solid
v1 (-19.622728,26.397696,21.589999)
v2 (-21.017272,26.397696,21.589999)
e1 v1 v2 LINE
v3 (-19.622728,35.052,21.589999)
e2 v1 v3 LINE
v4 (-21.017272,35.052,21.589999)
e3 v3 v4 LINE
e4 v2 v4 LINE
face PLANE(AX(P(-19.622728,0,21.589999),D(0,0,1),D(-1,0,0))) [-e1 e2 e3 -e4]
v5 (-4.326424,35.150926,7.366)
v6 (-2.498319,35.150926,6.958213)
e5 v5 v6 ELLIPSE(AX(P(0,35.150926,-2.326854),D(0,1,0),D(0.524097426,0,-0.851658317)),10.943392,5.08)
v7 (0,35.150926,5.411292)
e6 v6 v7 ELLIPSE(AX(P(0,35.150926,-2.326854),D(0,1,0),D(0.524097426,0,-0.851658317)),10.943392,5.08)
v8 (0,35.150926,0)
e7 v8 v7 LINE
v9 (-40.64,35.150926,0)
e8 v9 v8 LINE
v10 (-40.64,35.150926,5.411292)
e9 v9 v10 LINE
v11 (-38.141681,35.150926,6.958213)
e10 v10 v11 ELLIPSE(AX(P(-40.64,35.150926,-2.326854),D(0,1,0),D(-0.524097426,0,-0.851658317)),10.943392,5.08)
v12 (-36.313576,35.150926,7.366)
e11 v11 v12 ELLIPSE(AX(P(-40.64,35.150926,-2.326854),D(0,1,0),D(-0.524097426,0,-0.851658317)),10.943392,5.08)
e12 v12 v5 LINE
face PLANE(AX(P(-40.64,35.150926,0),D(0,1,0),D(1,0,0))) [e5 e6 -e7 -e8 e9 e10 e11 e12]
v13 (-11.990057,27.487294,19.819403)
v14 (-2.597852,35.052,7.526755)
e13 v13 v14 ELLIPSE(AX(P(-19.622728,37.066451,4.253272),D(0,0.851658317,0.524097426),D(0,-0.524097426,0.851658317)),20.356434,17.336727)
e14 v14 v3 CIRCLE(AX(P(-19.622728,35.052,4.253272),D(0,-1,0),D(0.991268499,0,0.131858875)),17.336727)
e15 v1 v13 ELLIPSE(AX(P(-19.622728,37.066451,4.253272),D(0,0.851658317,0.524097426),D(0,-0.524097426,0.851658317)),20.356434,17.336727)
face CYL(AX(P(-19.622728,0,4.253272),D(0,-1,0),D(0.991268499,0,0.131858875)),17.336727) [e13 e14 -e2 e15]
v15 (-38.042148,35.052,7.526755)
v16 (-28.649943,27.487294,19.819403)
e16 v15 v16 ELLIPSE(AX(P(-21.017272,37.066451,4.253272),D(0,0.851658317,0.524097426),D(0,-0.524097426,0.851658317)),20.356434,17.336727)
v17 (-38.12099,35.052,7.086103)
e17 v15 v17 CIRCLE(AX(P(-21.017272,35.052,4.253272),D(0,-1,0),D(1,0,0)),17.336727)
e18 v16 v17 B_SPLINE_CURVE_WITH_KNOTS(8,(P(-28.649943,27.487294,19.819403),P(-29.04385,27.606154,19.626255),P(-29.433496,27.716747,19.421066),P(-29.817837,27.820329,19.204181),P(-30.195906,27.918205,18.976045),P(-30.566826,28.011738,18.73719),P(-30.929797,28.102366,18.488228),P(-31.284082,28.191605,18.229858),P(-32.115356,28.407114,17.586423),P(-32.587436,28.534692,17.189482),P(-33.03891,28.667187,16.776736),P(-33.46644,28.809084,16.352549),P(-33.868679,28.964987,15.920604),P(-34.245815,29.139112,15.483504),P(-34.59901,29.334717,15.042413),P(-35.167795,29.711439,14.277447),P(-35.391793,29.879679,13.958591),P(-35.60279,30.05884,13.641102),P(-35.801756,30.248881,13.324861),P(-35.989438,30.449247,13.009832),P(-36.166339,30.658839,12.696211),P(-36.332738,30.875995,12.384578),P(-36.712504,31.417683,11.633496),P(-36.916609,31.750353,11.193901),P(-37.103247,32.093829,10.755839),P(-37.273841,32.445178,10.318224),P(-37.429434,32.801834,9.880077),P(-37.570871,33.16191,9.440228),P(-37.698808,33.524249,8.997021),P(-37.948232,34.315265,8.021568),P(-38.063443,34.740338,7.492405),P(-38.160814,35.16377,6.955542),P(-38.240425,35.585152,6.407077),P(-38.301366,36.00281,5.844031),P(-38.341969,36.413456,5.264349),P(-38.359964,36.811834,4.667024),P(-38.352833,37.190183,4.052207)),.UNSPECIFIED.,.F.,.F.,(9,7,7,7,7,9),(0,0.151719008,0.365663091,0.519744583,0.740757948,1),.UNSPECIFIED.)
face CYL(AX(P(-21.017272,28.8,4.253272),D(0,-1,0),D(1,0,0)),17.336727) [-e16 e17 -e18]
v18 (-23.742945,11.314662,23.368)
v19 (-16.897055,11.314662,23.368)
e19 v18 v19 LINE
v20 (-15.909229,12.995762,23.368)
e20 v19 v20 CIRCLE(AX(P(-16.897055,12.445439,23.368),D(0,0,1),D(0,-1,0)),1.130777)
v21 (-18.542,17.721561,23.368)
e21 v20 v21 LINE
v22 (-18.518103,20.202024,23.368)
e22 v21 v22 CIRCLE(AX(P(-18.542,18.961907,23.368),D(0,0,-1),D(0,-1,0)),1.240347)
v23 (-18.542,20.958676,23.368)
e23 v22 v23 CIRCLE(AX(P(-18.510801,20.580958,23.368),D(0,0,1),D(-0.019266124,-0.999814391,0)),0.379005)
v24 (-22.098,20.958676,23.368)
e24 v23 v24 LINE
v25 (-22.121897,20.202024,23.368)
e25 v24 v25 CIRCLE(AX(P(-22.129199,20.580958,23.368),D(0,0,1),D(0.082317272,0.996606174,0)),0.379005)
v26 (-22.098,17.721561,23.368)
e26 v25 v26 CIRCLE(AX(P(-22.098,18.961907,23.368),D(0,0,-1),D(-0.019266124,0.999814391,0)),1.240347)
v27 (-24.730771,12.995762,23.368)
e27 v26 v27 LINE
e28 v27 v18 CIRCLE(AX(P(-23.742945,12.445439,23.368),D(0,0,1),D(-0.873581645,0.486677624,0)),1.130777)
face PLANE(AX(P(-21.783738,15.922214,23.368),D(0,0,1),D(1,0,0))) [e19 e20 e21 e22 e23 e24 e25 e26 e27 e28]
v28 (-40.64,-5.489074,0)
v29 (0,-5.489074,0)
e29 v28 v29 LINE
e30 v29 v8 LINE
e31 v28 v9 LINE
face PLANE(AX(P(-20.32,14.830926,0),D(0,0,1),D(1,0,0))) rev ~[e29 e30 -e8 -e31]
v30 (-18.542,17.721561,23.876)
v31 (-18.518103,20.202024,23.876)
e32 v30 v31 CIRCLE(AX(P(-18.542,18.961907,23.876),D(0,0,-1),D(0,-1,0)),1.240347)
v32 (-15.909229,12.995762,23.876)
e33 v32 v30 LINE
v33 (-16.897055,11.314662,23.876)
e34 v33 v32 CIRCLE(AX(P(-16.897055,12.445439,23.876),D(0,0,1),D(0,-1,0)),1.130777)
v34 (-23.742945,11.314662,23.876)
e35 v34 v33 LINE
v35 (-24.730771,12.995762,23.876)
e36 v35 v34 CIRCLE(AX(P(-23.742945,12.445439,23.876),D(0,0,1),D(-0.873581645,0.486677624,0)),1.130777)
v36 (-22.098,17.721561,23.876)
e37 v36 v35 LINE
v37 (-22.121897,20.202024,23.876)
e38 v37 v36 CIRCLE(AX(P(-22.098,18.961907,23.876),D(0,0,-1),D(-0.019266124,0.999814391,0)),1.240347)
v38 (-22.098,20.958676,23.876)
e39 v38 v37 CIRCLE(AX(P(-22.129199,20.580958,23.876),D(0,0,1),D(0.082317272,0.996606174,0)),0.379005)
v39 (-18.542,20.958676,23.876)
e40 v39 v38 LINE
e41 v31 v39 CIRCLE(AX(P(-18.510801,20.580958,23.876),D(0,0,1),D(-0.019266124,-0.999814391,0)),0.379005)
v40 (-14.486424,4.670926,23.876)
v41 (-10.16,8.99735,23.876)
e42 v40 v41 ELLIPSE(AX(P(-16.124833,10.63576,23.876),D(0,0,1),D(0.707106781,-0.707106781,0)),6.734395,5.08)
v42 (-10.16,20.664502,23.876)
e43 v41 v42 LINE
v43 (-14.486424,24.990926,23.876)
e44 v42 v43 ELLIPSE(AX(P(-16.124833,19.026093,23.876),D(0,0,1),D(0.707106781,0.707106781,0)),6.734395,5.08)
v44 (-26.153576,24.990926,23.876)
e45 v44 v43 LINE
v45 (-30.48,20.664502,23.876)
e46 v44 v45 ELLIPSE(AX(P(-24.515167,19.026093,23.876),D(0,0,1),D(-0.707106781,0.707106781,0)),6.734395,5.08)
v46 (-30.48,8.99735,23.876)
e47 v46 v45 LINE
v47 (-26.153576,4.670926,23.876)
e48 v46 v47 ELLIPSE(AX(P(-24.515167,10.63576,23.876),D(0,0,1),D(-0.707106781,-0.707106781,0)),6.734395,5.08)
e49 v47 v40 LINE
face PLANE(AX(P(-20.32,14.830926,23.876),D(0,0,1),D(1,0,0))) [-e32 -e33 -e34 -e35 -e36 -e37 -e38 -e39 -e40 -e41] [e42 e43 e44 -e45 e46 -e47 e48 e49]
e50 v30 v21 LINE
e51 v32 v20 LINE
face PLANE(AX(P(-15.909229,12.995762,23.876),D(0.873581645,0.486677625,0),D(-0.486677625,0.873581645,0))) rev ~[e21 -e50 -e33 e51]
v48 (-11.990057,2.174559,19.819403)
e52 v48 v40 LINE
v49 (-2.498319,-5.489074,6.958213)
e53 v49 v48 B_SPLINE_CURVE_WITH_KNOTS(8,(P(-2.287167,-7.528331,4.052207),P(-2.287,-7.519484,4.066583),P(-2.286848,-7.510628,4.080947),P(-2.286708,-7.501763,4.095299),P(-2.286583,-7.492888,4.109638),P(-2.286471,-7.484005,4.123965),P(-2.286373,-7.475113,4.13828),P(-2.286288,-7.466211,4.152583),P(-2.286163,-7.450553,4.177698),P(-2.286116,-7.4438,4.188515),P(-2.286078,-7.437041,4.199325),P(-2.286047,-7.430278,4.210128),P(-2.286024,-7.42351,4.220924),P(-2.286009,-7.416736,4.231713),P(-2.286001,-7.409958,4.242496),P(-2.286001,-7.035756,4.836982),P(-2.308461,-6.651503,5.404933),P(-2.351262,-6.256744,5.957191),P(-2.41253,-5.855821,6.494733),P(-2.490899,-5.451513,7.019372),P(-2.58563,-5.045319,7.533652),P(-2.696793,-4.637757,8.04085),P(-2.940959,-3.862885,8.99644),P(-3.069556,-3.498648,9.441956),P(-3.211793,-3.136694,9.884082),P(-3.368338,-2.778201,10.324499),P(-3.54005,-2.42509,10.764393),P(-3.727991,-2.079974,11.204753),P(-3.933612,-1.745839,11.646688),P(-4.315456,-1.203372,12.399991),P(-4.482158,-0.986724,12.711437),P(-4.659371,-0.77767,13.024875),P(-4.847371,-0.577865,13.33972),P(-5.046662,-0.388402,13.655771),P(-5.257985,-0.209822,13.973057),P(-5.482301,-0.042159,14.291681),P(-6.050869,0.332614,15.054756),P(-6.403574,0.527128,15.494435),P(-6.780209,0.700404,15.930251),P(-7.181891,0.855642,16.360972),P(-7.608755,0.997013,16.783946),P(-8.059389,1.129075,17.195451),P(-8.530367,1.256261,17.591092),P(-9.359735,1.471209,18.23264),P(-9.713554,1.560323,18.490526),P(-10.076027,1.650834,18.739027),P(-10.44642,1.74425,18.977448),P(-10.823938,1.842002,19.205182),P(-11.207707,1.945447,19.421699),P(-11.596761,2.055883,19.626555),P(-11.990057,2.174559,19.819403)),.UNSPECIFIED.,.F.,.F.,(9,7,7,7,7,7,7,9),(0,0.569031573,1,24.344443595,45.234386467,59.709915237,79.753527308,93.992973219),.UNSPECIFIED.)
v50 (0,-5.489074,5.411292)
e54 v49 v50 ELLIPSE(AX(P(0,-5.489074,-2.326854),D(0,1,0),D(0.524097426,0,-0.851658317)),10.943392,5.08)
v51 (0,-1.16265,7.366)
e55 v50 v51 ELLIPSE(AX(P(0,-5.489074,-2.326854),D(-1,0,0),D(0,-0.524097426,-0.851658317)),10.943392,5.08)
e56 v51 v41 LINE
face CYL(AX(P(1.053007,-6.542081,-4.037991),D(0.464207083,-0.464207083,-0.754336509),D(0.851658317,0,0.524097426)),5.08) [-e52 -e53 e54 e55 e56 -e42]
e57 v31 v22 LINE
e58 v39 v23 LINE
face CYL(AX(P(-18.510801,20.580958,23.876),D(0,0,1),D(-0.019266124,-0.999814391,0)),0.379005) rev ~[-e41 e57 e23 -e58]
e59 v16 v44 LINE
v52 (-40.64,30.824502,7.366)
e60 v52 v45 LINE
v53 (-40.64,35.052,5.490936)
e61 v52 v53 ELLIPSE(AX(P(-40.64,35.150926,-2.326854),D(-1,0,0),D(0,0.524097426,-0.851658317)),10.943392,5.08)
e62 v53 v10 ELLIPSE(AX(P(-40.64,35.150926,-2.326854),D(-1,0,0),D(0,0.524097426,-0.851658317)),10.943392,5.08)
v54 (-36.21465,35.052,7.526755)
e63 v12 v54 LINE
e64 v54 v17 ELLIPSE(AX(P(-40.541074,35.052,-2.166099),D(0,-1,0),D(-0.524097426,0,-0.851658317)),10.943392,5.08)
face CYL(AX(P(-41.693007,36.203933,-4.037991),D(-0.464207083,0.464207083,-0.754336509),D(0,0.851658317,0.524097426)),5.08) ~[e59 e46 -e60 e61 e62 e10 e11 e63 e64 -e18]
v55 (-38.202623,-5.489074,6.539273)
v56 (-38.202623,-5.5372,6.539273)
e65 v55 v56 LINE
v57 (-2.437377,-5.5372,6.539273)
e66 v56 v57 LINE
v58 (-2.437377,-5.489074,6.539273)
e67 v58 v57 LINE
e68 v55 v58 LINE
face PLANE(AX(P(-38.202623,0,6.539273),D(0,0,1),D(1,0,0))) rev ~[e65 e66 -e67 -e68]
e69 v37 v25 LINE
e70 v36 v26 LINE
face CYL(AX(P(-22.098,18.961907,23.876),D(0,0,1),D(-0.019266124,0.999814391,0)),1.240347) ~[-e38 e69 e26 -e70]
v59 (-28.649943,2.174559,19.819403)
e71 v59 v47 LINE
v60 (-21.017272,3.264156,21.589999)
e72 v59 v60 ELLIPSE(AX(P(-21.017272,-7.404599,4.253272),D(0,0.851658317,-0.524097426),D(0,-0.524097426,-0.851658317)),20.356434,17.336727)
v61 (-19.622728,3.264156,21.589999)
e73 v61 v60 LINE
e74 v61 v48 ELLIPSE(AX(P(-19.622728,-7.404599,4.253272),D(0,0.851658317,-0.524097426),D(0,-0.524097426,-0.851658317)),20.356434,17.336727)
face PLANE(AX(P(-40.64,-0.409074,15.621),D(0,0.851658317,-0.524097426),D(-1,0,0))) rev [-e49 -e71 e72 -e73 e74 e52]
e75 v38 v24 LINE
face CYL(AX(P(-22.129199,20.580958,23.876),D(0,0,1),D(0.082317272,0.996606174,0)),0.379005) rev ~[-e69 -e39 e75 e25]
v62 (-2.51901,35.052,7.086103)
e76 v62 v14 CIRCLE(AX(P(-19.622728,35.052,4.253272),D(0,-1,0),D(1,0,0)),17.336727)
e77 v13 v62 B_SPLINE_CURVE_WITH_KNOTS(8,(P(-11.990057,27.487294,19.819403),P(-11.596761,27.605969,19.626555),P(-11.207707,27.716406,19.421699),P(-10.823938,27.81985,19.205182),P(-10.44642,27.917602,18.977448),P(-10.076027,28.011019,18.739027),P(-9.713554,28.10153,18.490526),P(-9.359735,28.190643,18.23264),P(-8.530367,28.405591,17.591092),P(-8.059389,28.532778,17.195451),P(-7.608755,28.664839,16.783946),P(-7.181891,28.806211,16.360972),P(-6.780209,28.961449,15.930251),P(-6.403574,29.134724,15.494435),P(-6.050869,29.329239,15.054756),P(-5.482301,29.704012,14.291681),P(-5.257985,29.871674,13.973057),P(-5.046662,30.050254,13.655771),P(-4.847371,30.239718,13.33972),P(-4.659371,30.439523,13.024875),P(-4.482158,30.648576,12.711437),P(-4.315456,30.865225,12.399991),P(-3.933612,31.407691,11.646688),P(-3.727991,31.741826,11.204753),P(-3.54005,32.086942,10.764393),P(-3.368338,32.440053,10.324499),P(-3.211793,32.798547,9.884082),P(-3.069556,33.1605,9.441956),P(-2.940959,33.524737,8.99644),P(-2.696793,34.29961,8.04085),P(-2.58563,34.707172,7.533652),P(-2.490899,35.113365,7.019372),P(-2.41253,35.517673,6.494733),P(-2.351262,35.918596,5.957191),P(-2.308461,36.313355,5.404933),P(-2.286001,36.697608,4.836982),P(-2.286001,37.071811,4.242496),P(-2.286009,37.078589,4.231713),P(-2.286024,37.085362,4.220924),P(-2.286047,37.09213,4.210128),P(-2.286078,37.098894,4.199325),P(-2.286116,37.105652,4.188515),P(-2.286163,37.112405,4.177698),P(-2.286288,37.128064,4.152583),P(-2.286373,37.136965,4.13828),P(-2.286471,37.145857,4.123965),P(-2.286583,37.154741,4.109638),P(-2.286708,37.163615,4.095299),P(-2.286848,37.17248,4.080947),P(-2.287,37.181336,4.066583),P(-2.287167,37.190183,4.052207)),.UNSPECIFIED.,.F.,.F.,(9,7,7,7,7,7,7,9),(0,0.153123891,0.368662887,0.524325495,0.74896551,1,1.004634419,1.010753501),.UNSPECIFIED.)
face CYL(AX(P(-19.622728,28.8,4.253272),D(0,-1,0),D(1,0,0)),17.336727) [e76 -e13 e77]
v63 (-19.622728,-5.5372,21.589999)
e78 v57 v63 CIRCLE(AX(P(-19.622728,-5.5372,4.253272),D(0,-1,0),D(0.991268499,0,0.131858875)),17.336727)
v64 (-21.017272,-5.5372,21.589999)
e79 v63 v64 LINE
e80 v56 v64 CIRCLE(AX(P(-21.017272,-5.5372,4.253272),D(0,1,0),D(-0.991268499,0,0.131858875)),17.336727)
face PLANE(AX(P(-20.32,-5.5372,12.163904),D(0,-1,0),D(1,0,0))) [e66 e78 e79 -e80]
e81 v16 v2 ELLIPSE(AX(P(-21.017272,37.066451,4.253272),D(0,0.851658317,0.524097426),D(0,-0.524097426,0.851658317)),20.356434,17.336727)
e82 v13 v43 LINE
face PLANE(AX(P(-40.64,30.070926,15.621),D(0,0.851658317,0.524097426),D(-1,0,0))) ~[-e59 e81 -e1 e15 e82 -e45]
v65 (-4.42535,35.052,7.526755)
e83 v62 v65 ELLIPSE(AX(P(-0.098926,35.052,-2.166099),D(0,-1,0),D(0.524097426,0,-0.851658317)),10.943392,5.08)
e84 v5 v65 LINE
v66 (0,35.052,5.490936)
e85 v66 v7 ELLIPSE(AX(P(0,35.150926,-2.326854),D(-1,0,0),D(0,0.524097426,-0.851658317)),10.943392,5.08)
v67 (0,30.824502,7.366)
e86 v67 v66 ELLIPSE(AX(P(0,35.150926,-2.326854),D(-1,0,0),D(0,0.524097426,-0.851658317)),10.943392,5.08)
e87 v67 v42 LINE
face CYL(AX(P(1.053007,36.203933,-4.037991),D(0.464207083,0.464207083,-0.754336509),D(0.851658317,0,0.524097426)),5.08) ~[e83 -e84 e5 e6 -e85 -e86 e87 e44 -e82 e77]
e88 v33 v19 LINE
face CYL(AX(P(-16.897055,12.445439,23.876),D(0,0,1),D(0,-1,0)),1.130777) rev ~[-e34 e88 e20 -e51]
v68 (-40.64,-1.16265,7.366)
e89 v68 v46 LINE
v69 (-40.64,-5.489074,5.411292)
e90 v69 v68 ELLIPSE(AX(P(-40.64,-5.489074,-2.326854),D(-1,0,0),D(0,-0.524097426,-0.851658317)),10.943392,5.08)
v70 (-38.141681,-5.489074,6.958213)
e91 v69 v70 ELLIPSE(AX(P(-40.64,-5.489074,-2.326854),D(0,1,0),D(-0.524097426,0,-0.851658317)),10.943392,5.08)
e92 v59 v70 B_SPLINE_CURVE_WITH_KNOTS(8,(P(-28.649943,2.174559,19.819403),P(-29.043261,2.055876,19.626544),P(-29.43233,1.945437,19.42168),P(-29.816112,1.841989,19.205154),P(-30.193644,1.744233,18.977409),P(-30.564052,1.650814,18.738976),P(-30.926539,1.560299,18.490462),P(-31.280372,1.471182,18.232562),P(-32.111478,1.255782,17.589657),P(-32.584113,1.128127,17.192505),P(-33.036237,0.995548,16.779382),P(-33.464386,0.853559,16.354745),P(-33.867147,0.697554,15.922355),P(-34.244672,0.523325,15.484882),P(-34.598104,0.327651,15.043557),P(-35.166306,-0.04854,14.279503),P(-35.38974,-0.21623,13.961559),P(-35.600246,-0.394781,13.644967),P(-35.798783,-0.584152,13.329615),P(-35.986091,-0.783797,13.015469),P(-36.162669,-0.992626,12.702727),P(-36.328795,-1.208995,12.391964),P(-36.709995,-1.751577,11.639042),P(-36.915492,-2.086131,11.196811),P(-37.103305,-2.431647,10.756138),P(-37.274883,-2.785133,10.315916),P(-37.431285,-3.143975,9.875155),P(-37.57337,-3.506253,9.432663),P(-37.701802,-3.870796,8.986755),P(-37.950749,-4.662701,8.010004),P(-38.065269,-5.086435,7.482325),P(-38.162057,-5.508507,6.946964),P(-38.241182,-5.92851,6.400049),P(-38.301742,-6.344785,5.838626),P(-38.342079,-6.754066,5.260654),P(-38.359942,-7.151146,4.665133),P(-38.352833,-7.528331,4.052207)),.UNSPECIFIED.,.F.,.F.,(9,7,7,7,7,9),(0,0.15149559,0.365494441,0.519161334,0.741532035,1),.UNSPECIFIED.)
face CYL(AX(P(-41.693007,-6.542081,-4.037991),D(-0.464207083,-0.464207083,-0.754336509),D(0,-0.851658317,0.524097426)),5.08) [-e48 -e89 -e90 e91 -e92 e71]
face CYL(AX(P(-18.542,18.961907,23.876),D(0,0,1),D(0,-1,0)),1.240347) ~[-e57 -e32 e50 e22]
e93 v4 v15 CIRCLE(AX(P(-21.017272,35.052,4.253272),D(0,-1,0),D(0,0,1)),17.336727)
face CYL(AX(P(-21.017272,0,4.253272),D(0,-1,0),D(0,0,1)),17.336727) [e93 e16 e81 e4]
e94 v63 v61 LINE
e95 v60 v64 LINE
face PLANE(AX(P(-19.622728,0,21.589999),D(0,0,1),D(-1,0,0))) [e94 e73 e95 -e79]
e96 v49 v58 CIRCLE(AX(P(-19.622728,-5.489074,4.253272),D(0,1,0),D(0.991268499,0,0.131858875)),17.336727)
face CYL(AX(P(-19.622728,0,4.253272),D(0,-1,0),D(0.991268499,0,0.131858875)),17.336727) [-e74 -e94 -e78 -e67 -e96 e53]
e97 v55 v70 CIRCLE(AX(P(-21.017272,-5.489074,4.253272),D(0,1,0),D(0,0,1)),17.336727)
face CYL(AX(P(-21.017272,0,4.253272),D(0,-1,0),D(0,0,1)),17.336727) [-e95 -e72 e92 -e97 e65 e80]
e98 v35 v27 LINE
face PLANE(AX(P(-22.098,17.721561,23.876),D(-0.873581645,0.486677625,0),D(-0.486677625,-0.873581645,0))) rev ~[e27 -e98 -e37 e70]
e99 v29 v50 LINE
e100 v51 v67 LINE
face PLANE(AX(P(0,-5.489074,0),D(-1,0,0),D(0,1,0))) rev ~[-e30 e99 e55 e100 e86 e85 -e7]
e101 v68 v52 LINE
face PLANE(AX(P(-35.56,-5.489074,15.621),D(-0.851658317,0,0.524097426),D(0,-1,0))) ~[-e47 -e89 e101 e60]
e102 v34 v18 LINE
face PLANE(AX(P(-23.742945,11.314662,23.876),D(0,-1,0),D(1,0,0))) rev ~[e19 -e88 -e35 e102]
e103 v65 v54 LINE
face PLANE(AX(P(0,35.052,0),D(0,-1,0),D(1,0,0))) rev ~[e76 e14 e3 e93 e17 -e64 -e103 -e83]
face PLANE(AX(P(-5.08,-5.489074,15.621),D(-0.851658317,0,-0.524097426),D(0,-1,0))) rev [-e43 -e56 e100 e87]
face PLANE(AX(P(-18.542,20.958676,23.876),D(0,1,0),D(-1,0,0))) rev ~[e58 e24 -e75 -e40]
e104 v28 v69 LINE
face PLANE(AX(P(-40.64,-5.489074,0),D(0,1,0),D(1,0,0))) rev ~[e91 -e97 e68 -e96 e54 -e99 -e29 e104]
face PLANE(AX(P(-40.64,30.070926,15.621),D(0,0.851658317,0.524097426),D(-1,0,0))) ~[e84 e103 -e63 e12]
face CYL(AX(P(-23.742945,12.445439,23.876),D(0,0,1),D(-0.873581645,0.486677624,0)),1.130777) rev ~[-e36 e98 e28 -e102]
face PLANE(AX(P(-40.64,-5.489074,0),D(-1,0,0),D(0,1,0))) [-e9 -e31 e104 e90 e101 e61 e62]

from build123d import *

# Parameters (mm, degrees)
F0_W          = 40.64
F0_H          = 40.64
F1_DEPTH      = 23.876
F2_SIZE2      = 10.16
F2_SIZE       = 16.51
F4_DEPTH      = 5.5372
F4_DEPTH_BACK = 35.052
F6_DEPTH      = 0.508
F7_T4_DEPTH   = 41.0469310155
F7_S5_R       = 17.3367265746
F7_T6_DEPTH   = 25
F7_T10_DEPTH  = 41.0469310155
F7_S11_R      = 17.3367265746
F7_T12_DEPTH  = 25
F7_T16_DEPTH  = 41.0469310155
F7_S17_R      = 17.3367265746
F7_T18_DEPTH  = 25
F7_T23_DEPTH  = 41.0469310155
F7_S24_R      = 17.3367265746
F7_T25_DEPTH  = 25
F7_T30_DEPTH  = 41.0469310155
F7_S31_R      = 17.3367265746
F7_T32_DEPTH  = 25
F7_T37_DEPTH  = 41.0469310155
F7_S39_R      = 17.3367265746
F7_T40_DEPTH  = 25
F7_T44_DEPTH  = 41.0469310155
F7_S46_R      = 17.3367265746
F7_T47_DEPTH  = 25
F7_T51_DEPTH  = 41.0469310155
F7_S53_R      = 17.3367265746
F7_T54_DEPTH  = 25


# Not quite as in the source:
# - a fillet or chamfer that OpenCascade refuses, or shapes differently, is made with other operations: its cross-section is extruded or revolved along the edge and cut away or added


with BuildPart() as f1:
    # F0 (on Top) → F1 (new body)
    with BuildSketch(Plane.XY):
        with Locations((-20.32, 14.8309261845)):
            Rectangle(F0_W, F0_H)
    extrude(amount=F1_DEPTH)

    # F2
    f2_edges = [f1.edges().sort_by_distance(p)[0] for p in [
        (0, 14.830926, 23.876),
        (-20.32, 35.150926, 23.876),
        (-40.64, 14.830926, 23.876),
        (-20.32, -5.489074, 23.876),
    ]]
    chamfer(f2_edges, length=F2_SIZE, length2=F2_SIZE2)

    # F3 (on Front) → F4 (join, two sides)
    with BuildSketch(Plane.XZ) as f4_sk:
        with BuildLine():
            Line((-19.622727835, 21.5899987397), (-21.017272165, 21.5899987397))
            ThreePointArc((-21.017272165, 21.5899987397), (-32.4394065874, 17.2953936781), (-38.2026230943, 6.5392734254))
            Line((-38.2026230943, 6.5392734254), (-2.4373769057, 6.5392734254))
            ThreePointArc((-2.4373769057, 6.5392734254), (-8.2005934126, 17.2953936781), (-19.622727835, 21.5899987397))
        make_face()
    extrude(amount=F4_DEPTH)
    extrude(f4_sk.sketch, amount=-F4_DEPTH_BACK)

    # F5 (on face) → F6 (cut)
    with BuildSketch(Plane.XY.offset(23.876)):
        with BuildLine():
            Line((-20.32, 11.3146617191), (-20.32, 20.958676386))
            Line((-20.32, 20.958676386), (-22.098, 20.958676386))
            ThreePointArc((-22.098, 20.958676386), (-22.5080143202, 20.5929218839), (-22.1218966733, 20.2020238648))
            ThreePointArc((-22.1218966733, 20.2020238648), (-20.8577108363, 18.9738562556), (-22.098, 17.7215606446))
            Line((-22.098, 17.7215606446), (-24.7307707736, 12.9957624854))
            ThreePointArc((-24.7307707736, 12.9957624854), (-24.7178678661, 11.8725673854), (-23.7429447999, 11.3146617191))
            Line((-23.7429447999, 11.3146617191), (-20.32, 11.3146617191))
        make_face()
        with BuildLine():
            Line((-18.542, 20.958676386), (-20.32, 20.958676386))
            Line((-20.32, 20.958676386), (-20.32, 11.3146617191))
            Line((-20.32, 11.3146617191), (-16.8970552001, 11.3146617191))
            ThreePointArc((-16.8970552001, 11.3146617191), (-15.9221321339, 11.8725673854), (-15.9092292264, 12.9957624854))
            Line((-15.9092292264, 12.9957624854), (-18.542, 17.7215606446))
            ThreePointArc((-18.542, 17.7215606446), (-19.7822891637, 18.9738562556), (-18.5181033267, 20.2020238648))
            ThreePointArc((-18.5181033267, 20.2020238648), (-18.1319856798, 20.5929218839), (-18.542, 20.958676386))
        make_face()
    extrude(amount=-F6_DEPTH, mode=Mode.SUBTRACT)

    # F7: fillet of radius 5.08 on 4 edges, made by hand


with BuildPart() as f7_tool2:
    # F7_s3 → F7_t4 (new body)
    with BuildSketch(Plane(origin=(-11.8080697784, -11.8080697784, -19.18811339), x_dir=(-0.7071067812, 0.7071067812, 0), z_dir=(0.4642070825, 0.4642070825, 0.7543365091))):
        with BuildLine():
            ThreePointArc((21.7962143454, 27.1330755892), (24.85545827, 28.157532887), (27.9147021947, 27.1330755892))
            Line((27.9147021947, 27.1330755892), (24.85545827, 29.4407749719))
            Line((24.85545827, 29.4407749719), (21.7962143454, 27.1330755892))
        make_face()
    extrude(amount=F7_T4_DEPTH)

    # F7_s5 → F7_t6 (cut, symmetric)
    with BuildSketch(Plane.XZ.offset(-0.8)):
        with Locations((-21.017272165, 4.253272165)):
            Circle(F7_S5_R)
    extrude(amount=F7_T6_DEPTH, both=True, mode=Mode.SUBTRACT)


with BuildPart() as f1_1:
    add(f1.part)

    # F7_t1: cut F7_tool2
    add(f7_tool2.part, mode=Mode.SUBTRACT)


with BuildPart() as f7_tool8:
    # F7_s9 → F7_t10 (new body)
    with BuildSketch(Plane(origin=(3.050628701, -3.050628701, -4.9572716391), x_dir=(-0.7071067812, -0.7071067812, 0), z_dir=(-0.4642070825, 0.4642070825, 0.7543365091))):
        with BuildLine():
            ThreePointArc((0.8221173927, 5.4558434178), (3.8813613174, 6.4803007156), (6.9406052421, 5.4558434178))
            Line((6.9406052421, 5.4558434178), (3.8813613174, 7.7635428005))
            Line((3.8813613174, 7.7635428005), (0.8221173927, 5.4558434178))
        make_face()
    extrude(amount=F7_T10_DEPTH)

    # F7_s11 → F7_t12 (cut, symmetric)
    with BuildSketch(Plane.XZ.offset(-0.8)):
        with Locations((-19.622727835, 4.253272165)):
            Circle(F7_S11_R)
    extrude(amount=F7_T12_DEPTH, both=True, mode=Mode.SUBTRACT)


with BuildPart() as f1_2:
    add(f1_1.part)

    # F7_t7: cut F7_tool8
    add(f7_tool8.part, mode=Mode.SUBTRACT)


with BuildPart() as f7_tool14:
    # F7_s15 → F7_t16 (new body)
    with BuildSketch(Plane(origin=(9.442408336, 9.442408336, -15.3439135461), x_dir=(0.7071067812, -0.7071067812, 0), z_dir=(-0.4642070825, -0.4642070825, 0.7543365091))):
        with BuildLine():
            ThreePointArc((-21.7962143454, 21.2773704954), (-24.85545827, 22.3018277932), (-27.9147021947, 21.2773704954))
            Line((-27.9147021947, 21.2773704954), (-24.85545827, 23.5850698781))
            Line((-24.85545827, 23.5850698781), (-21.7962143454, 21.2773704954))
        make_face()
    extrude(amount=F7_T16_DEPTH)

    # F7_s17 → F7_t18 (cut, symmetric)
    with BuildSketch(Plane.XZ.offset(-28.8)):
        with Locations((-19.622727835, 4.253272165)):
            Circle(F7_S17_R)
    extrude(amount=F7_T18_DEPTH, both=True, mode=Mode.SUBTRACT)

    split(bisect_by=Plane.XZ.offset(-35.052), keep=Keep.BOTTOM)


with BuildPart() as f1_3:
    add(f1_2.part)

    # F7_t13: cut F7_tool14
    add(f7_tool14.part, mode=Mode.SUBTRACT)


with BuildPart() as f7_tool21:
    # F7_s22 → F7_t23 (new body)
    with BuildSketch(Plane(origin=(9.442408336, 9.442408336, -15.3439135461), x_dir=(0.7071067812, -0.7071067812, 0), z_dir=(-0.4642070825, -0.4642070825, 0.7543365091))):
        with BuildLine():
            ThreePointArc((-21.7962143454, 21.2773704954), (-24.85545827, 22.3018277932), (-27.9147021947, 21.2773704954))
            Line((-27.9147021947, 21.2773704954), (-24.85545827, 23.5850698781))
            Line((-24.85545827, 23.5850698781), (-21.7962143454, 21.2773704954))
        make_face()
    extrude(amount=F7_T23_DEPTH)

    # F7_s24 → F7_t25 (intersect, symmetric)
    with BuildSketch(Plane.XZ.offset(-28.8)):
        with Locations((-19.622727835, 4.253272165)):
            Circle(F7_S24_R)
    extrude(amount=F7_T25_DEPTH, both=True, mode=Mode.INTERSECT)

    split(bisect_by=Plane.XZ.offset(-35.052), keep=Keep.BOTTOM)


with BuildPart() as f1_4:
    add(f1_3.part)

    # F7_t20: cut F7_tool21
    add(f7_tool21.part, mode=Mode.SUBTRACT)


with BuildPart() as f7_tool28:
    # F7_s29 → F7_t30 (new body)
    with BuildSketch(Plane(origin=(9.442408336, 9.442408336, -15.3439135461), x_dir=(0.7071067812, -0.7071067812, 0), z_dir=(-0.4642070825, -0.4642070825, 0.7543365091))):
        with BuildLine():
            ThreePointArc((-21.7962143454, 21.2773704954), (-24.85545827, 22.3018277932), (-27.9147021947, 21.2773704954))
            Line((-27.9147021947, 21.2773704954), (-24.85545827, 23.5850698781))
            Line((-24.85545827, 23.5850698781), (-21.7962143454, 21.2773704954))
        make_face()
    extrude(amount=F7_T30_DEPTH)

    # F7_s31 → F7_t32 (cut, symmetric)
    with BuildSketch(Plane.XZ.offset(-28.8)):
        with Locations((-19.622727835, 4.253272165)):
            Circle(F7_S31_R)
    extrude(amount=F7_T32_DEPTH, both=True, mode=Mode.SUBTRACT)

    split(bisect_by=Plane.XZ.offset(-35.052), keep=Keep.TOP)


with BuildPart() as f1_5:
    add(f1_4.part)

    # F7_t27: cut F7_tool28
    add(f7_tool28.part, mode=Mode.SUBTRACT)


with BuildPart() as f7_tool35:
    # F7_s36 → F7_t37 (new body)
    with BuildSketch(Plane(origin=(-18.1998494135, 18.1998494135, -29.5747552969), x_dir=(0.7071067812, 0.7071067812, 0), z_dir=(0.4642070825, -0.4642070825, 0.7543365091))):
        with BuildLine():
            ThreePointArc((-0.8221173927, 42.9546026668), (-3.8813613174, 43.9790599646), (-6.9406052421, 42.9546026668))
            Line((-6.9406052421, 42.9546026668), (-3.8813613174, 45.2623020495))
            Line((-3.8813613174, 45.2623020495), (-0.8221173927, 42.9546026668))
        make_face()
    extrude(amount=F7_T37_DEPTH)

    split(bisect_by=Plane.XZ.offset(-35.052), keep=Keep.BOTTOM)

    # F7_s39 → F7_t40 (cut, symmetric)
    with BuildSketch(Plane.XZ.offset(-28.8)):
        with Locations((-21.017272165, 4.253272165)):
            Circle(F7_S39_R)
    extrude(amount=F7_T40_DEPTH, both=True, mode=Mode.SUBTRACT)


with BuildPart() as f1_6:
    add(f1_5.part)

    # F7_t34: cut F7_tool35
    add(f7_tool35.part, mode=Mode.SUBTRACT)


with BuildPart() as f7_tool42:
    # F7_s43 → F7_t44 (new body)
    with BuildSketch(Plane(origin=(-18.1998494135, 18.1998494135, -29.5747552969), x_dir=(0.7071067812, 0.7071067812, 0), z_dir=(0.4642070825, -0.4642070825, 0.7543365091))):
        with BuildLine():
            ThreePointArc((-0.8221173927, 42.9546026668), (-3.8813613174, 43.9790599646), (-6.9406052421, 42.9546026668))
            Line((-6.9406052421, 42.9546026668), (-3.8813613174, 45.2623020495))
            Line((-3.8813613174, 45.2623020495), (-0.8221173927, 42.9546026668))
        make_face()
    extrude(amount=F7_T44_DEPTH)

    split(bisect_by=Plane.XZ.offset(-35.052), keep=Keep.TOP)

    # F7_s46 → F7_t47 (cut, symmetric)
    with BuildSketch(Plane.XZ.offset(-28.8)):
        with Locations((-21.017272165, 4.253272165)):
            Circle(F7_S46_R)
    extrude(amount=F7_T47_DEPTH, both=True, mode=Mode.SUBTRACT)


with BuildPart() as f1_7:
    add(f1_6.part)

    # F7_t41: cut F7_tool42
    add(f7_tool42.part, mode=Mode.SUBTRACT)


with BuildPart() as f7_tool49:
    # F7_s50 → F7_t51 (new body)
    with BuildSketch(Plane(origin=(-18.1998494135, 18.1998494135, -29.5747552969), x_dir=(0.7071067812, 0.7071067812, 0), z_dir=(0.4642070825, -0.4642070825, 0.7543365091))):
        with BuildLine():
            ThreePointArc((-0.8221173927, 42.9546026668), (-3.8813613174, 43.9790599646), (-6.9406052421, 42.9546026668))
            Line((-6.9406052421, 42.9546026668), (-3.8813613174, 45.2623020495))
            Line((-3.8813613174, 45.2623020495), (-0.8221173927, 42.9546026668))
        make_face()
    extrude(amount=F7_T51_DEPTH)

    split(bisect_by=Plane.XZ.offset(-35.052), keep=Keep.BOTTOM)

    # F7_s53 → F7_t54 (intersect, symmetric)
    with BuildSketch(Plane.XZ.offset(-28.8)):
        with Locations((-21.017272165, 4.253272165)):
            Circle(F7_S53_R)
    extrude(amount=F7_T54_DEPTH, both=True, mode=Mode.INTERSECT)


with BuildPart() as f1_8:
    add(f1_7.part)

    # F7_t48: cut F7_tool49
    add(f7_tool49.part, mode=Mode.SUBTRACT)


solid = f1_8.part
